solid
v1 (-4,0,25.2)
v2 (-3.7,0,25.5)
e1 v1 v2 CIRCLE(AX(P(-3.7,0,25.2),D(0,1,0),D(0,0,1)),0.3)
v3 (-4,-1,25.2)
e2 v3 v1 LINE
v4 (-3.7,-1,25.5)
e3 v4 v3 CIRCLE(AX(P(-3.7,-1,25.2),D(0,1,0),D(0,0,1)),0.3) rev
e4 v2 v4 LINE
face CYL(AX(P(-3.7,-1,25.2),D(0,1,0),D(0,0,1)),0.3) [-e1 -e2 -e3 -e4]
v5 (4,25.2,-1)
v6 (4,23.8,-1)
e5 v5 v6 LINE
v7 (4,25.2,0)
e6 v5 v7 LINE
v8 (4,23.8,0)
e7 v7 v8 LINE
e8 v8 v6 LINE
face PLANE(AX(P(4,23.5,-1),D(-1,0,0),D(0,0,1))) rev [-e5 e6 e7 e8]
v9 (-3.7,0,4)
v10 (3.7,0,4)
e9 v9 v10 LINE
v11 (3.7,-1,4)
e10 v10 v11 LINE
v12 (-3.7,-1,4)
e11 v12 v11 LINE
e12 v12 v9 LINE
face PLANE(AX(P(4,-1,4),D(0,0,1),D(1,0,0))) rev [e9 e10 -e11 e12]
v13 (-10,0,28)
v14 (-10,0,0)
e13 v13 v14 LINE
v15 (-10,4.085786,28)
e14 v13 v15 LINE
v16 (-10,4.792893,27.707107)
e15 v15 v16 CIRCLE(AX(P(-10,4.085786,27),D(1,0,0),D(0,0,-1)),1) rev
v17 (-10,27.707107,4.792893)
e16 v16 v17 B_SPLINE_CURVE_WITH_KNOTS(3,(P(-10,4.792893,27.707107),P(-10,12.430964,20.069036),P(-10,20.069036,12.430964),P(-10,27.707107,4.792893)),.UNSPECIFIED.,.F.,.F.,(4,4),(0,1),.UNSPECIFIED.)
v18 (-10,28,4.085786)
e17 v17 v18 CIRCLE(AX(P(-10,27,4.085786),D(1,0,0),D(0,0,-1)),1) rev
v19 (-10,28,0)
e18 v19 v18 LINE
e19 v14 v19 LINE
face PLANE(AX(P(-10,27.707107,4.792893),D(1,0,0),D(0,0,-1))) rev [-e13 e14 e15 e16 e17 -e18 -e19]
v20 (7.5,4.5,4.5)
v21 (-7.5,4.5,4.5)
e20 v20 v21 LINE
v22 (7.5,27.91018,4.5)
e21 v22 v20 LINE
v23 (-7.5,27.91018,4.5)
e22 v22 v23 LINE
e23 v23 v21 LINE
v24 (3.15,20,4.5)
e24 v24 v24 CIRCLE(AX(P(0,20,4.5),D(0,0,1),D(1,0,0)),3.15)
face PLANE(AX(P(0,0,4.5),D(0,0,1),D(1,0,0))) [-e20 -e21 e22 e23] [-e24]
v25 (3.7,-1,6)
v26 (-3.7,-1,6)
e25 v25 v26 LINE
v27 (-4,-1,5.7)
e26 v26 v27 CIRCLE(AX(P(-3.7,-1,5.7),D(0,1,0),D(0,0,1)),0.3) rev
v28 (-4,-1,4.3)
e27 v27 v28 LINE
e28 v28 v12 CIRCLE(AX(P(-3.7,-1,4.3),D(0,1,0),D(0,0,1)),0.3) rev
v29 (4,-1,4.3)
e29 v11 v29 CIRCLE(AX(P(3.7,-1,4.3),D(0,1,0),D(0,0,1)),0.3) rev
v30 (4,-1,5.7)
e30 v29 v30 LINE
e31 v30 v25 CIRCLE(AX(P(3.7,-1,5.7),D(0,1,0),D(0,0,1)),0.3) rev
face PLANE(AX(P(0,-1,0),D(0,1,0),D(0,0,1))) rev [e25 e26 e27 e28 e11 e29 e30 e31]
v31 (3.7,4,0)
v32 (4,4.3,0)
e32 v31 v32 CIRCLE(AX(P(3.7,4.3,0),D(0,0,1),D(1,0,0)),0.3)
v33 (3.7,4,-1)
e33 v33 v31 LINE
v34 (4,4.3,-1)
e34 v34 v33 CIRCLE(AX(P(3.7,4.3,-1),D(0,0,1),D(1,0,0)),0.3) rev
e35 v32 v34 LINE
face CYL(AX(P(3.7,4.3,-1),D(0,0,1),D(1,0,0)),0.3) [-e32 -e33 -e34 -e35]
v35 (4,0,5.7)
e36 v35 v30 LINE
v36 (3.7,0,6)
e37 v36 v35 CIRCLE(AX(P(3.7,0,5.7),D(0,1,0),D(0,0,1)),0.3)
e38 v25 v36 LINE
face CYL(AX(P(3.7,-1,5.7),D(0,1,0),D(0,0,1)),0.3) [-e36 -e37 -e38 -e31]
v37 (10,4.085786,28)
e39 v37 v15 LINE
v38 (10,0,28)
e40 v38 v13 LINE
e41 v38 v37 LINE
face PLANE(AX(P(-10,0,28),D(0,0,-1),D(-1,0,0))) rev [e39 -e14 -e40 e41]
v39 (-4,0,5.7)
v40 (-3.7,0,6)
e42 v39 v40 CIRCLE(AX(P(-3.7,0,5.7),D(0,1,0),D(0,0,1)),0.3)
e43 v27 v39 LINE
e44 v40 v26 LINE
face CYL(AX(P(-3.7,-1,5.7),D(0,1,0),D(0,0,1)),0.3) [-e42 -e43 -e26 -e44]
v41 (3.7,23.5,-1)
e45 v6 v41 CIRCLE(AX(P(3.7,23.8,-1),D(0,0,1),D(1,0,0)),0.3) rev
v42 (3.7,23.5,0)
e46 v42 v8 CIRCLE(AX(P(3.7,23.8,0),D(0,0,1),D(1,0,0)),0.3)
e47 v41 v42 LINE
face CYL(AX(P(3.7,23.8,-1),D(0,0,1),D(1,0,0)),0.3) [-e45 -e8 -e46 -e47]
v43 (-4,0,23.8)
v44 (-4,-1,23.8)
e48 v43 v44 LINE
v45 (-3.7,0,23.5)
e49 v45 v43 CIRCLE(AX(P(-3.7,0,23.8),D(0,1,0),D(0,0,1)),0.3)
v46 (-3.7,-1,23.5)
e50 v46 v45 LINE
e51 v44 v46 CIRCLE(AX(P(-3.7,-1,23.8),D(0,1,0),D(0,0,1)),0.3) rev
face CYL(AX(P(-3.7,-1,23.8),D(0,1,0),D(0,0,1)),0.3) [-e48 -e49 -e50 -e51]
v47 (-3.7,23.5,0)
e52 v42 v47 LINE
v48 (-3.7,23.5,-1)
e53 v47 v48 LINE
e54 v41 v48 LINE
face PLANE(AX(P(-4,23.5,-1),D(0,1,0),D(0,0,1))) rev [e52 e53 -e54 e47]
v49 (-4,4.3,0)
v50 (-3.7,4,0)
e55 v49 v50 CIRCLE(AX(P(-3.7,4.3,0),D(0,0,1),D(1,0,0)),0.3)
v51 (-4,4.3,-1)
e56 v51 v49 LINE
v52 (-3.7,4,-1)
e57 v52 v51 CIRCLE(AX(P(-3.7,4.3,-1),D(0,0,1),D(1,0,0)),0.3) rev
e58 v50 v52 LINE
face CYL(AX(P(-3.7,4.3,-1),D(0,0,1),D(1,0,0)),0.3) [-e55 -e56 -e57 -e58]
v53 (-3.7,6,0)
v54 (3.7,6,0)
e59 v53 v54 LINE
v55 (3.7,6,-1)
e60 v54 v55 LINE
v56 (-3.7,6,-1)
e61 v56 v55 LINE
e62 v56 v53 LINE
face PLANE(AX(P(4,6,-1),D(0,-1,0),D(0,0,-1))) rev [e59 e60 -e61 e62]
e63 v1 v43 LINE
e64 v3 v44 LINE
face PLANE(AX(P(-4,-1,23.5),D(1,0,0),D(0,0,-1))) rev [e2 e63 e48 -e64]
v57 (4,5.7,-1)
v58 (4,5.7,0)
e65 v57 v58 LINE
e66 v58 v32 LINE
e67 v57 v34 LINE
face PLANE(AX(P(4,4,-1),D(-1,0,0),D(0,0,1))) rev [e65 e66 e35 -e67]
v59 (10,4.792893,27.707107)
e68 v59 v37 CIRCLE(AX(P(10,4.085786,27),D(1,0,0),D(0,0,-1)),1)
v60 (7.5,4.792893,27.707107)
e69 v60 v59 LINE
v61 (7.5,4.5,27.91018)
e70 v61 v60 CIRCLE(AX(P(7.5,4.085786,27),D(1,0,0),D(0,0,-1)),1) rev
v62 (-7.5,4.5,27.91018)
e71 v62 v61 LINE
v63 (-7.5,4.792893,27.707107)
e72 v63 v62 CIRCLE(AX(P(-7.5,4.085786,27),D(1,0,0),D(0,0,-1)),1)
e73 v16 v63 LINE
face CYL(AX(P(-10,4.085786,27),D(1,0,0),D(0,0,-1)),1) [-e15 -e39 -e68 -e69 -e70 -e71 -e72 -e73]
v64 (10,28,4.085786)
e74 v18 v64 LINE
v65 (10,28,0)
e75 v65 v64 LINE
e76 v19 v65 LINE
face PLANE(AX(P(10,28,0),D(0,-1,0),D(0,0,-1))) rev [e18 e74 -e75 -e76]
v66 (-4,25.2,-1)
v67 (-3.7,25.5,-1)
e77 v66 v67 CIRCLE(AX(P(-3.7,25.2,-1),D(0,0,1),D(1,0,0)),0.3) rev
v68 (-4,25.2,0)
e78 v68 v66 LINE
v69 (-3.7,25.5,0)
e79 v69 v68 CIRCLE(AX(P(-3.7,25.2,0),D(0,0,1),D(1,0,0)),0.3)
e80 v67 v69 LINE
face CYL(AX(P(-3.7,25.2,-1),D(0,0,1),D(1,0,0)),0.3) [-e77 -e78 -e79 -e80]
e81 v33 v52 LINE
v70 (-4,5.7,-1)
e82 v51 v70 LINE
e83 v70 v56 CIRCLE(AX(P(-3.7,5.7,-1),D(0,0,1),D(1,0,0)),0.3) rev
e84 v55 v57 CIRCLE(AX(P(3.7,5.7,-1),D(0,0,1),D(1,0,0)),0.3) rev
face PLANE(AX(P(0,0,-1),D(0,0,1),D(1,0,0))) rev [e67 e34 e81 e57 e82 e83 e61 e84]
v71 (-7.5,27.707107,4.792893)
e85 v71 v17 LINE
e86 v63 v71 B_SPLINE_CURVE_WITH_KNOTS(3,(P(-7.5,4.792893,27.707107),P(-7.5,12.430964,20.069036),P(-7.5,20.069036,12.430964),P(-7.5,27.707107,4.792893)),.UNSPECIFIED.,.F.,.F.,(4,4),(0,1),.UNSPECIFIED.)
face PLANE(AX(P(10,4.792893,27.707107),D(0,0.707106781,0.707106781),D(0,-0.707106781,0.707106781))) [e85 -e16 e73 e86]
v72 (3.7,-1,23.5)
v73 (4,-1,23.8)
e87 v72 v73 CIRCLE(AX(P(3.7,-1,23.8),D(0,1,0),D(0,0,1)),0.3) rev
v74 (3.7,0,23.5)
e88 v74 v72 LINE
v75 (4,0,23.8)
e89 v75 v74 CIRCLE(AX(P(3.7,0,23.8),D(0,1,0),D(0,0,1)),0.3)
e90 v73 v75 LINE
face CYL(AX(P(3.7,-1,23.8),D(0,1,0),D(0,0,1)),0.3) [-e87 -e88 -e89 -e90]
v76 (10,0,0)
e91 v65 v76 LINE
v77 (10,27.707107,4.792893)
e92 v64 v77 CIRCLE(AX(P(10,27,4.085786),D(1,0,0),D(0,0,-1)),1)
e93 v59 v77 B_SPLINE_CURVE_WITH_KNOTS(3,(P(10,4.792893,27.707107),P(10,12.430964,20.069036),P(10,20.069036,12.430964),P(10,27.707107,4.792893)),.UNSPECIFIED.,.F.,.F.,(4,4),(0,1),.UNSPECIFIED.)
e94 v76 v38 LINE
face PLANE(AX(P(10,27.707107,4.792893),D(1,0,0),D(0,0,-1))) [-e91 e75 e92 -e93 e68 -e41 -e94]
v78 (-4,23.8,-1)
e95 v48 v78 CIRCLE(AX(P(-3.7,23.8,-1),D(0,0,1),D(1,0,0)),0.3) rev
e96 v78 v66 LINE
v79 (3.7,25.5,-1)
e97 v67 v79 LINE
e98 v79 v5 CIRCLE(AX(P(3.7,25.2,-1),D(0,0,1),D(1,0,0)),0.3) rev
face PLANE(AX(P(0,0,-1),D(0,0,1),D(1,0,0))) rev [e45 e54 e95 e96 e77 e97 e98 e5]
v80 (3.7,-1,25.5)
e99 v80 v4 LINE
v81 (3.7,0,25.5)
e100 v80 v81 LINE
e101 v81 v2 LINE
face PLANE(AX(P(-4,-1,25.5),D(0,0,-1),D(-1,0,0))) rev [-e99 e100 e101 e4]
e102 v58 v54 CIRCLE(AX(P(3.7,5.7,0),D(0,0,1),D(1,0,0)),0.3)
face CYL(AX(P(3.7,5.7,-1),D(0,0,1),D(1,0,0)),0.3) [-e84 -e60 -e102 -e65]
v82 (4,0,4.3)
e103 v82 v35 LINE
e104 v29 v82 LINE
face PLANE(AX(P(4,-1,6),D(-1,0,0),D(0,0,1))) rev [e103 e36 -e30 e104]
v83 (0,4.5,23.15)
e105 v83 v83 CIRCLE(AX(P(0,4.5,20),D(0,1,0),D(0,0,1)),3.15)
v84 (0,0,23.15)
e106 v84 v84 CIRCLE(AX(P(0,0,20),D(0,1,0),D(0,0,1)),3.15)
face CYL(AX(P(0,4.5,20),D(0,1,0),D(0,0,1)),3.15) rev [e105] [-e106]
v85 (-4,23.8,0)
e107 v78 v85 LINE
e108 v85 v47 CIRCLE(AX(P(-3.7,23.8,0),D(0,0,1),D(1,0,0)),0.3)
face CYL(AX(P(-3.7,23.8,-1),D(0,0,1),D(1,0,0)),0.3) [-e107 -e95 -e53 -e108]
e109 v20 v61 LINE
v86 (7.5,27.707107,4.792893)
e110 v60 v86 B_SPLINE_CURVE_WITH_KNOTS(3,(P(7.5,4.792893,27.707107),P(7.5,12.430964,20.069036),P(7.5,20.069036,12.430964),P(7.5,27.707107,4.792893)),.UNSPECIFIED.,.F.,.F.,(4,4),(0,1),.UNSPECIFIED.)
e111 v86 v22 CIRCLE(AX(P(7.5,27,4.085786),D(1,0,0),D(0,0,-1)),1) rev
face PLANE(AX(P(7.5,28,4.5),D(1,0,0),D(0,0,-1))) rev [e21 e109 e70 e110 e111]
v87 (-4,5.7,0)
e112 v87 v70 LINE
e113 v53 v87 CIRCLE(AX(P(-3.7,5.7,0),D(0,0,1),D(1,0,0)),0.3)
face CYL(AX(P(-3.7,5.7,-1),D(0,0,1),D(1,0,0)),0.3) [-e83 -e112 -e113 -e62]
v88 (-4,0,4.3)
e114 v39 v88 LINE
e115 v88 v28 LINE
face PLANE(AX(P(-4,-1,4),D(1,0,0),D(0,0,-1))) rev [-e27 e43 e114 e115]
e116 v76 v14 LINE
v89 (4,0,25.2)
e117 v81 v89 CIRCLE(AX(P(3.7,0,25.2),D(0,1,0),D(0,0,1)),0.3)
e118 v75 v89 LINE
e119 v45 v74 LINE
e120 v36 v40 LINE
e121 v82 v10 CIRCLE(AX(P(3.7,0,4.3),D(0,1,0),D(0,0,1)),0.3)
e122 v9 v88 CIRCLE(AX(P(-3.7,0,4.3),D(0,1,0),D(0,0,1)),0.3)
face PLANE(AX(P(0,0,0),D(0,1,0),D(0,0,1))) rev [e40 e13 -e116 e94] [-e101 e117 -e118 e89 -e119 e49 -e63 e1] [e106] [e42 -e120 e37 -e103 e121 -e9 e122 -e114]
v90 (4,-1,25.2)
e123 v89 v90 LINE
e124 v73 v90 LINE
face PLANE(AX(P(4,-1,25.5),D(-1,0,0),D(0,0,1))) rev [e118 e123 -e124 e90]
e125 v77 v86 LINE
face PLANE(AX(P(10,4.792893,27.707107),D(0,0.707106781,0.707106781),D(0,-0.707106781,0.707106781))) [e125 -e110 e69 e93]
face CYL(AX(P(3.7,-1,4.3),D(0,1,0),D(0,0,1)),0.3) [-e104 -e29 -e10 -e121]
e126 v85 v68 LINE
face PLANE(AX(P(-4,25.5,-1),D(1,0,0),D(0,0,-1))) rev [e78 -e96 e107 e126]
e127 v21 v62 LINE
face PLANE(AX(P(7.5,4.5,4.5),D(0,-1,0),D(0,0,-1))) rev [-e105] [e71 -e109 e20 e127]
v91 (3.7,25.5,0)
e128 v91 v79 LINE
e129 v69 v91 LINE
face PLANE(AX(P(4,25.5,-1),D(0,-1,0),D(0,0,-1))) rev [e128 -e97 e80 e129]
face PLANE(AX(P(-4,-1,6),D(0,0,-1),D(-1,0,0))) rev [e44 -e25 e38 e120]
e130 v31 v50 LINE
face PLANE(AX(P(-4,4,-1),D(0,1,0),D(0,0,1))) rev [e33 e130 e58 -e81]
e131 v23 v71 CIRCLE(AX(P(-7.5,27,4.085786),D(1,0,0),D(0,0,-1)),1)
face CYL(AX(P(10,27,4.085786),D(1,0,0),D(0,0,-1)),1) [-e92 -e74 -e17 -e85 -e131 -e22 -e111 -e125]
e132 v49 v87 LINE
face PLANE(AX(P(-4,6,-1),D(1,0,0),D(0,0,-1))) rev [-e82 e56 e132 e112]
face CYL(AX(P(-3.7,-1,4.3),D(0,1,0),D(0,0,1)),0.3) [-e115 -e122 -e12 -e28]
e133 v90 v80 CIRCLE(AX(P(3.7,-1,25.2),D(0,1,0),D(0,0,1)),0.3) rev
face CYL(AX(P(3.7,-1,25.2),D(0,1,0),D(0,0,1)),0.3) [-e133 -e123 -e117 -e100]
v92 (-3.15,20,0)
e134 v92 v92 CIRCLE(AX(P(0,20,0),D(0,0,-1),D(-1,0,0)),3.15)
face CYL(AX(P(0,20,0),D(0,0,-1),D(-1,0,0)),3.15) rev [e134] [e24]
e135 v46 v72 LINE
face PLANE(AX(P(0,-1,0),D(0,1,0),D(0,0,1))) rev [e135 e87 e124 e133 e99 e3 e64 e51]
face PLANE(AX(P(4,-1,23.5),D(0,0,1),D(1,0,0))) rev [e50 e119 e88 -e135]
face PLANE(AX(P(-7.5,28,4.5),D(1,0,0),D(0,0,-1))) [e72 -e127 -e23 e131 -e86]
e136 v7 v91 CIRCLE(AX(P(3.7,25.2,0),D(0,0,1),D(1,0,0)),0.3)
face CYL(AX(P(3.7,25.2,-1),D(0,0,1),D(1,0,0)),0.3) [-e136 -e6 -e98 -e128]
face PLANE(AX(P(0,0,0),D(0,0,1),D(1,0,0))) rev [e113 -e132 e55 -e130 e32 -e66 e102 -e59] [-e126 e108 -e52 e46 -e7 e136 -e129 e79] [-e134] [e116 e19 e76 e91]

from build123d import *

# Parameters (mm, degrees)
BOSS_EXTRUDE1_DEPTH            = 20
SKETCH2_W                      = 20
SKETCH2_H                      = 23.5
BOSS_EXTRUDE2_DEPTH            = 4.5
CUT_EXTRUDE1_DEPTH             = 15
SKETCH4_W                      = 20
SKETCH4_H                      = 28
BOSS_EXTRUDE3_DEPTH            = 4.5
SKETCH5_W                      = 8
SKETCH5_H                      = 2
BOSS_EXTRUDE4_DEPTH            = 1
SKETCH6_W                      = 8
SKETCH6_H                      = 2
BOSS_EXTRUDE5_DEPTH            = 1
SKETCH7_W                      = 8
SKETCH7_H                      = 2
BOSS_EXTRUDE6_DEPTH            = 1
SKETCH8_W                      = 8
SKETCH8_H                      = 2
BOSS_EXTRUDE7_DEPTH            = 1
F_6_3_6_3_DIAMETER_HOLE1_D     = 6.3
F_6_3_6_3_DIAMETER_HOLE1_DEPTH = 28
F_6_3_6_3_DIAMETER_HOLE2_D     = 6.3
F_6_3_6_3_DIAMETER_HOLE2_DEPTH = 5.5
FILLET1_R                      = 0.3
FILLET2_START                  = -11
FILLET2_DEPTH                  = 22


with BuildPart() as part:
    # Sketch1 → Boss-Extrude1 (new body)
    with BuildSketch(Plane(origin=(-10, 0, 0), x_dir=(0, -1, 0), z_dir=(-1, 0, 0))):
        with BuildLine():
            Line((-28, 4.5), (-4.5, 4.5))
            Line((-4.5, 4.5), (-4.5, 28))
            Line((-4.5, 28), (-4.792893219, 27.707106781))
            add(Edge.make_bspline(
                [(-4.792893219, 27.707106781), (-12.430964406, 20.069035594), (-20.069035594, 12.430964406), (-27.707106781, 4.792893219)],
                knots=[0, 0, 0, 0, 1, 1, 1, 1], degree=3))
            Line((-27.707106781, 4.792893219), (-28, 4.5))
        make_face()
    extrude(amount=-BOSS_EXTRUDE1_DEPTH)

    # Sketch2 → Boss-Extrude2 (add)
    with BuildSketch(Plane.XZ.offset(-4.5)):
        with Locations((0, 16.25)):
            Rectangle(SKETCH2_W, SKETCH2_H)
    extrude(amount=BOSS_EXTRUDE2_DEPTH)

    # Sketch3 → Cut-Extrude1 (cut)
    with BuildSketch(Plane(origin=(-7.5, 0, 0), x_dir=(0, -1, 0), z_dir=(-1, 0, 0))):
        with BuildLine():
            Line((-4.5, 4.5), (-4.5, 28))
            Line((-4.5, 28), (-4.792893219, 27.707106781))
            add(Edge.make_bspline(
                [(-4.792893219, 27.707106781), (-12.430964406, 20.069035594), (-20.069035594, 12.430964406), (-27.707106781, 4.792893219)],
                knots=[0, 0, 0, 0, 1, 1, 1, 1], degree=3))
            Line((-27.707106781, 4.792893219), (-28, 4.5))
            Line((-28, 4.5), (-4.5, 4.5))
        make_face()
    extrude(amount=-CUT_EXTRUDE1_DEPTH, mode=Mode.SUBTRACT)

    # Sketch4 → Boss-Extrude3 (add)
    with BuildSketch(Plane(origin=(0, 0, 4.5), x_dir=(-1, 0, 0), z_dir=(0, 0, -1))):
        with Locations((0, 14)):
            Rectangle(SKETCH4_W, SKETCH4_H)
    extrude(amount=BOSS_EXTRUDE3_DEPTH)

    # Sketch5 → Boss-Extrude4 (add)
    with BuildSketch(Plane.XZ):
        with Locations((0, 24.5)):
            Rectangle(SKETCH5_W, SKETCH5_H)
    extrude(amount=BOSS_EXTRUDE4_DEPTH)

    # Sketch6 → Boss-Extrude5 (add)
    with BuildSketch(Plane.XZ):
        with Locations((0, 5)):
            Rectangle(SKETCH6_W, SKETCH6_H)
    extrude(amount=BOSS_EXTRUDE5_DEPTH)

    # Sketch7 → Boss-Extrude6 (add)
    with BuildSketch(Plane(origin=(0, 0, 0), x_dir=(-1, 0, 0), z_dir=(0, 0, -1))):
        with Locations((0, 5)):
            Rectangle(SKETCH7_W, SKETCH7_H)
    extrude(amount=BOSS_EXTRUDE6_DEPTH)

    # Sketch8 → Boss-Extrude7 (add)
    with BuildSketch(Plane(origin=(0, 0, 0), x_dir=(-1, 0, 0), z_dir=(0, 0, -1))):
        with Locations((0, 24.5)):
            Rectangle(SKETCH8_W, SKETCH8_H)
    extrude(amount=BOSS_EXTRUDE7_DEPTH)

    # Ø6.3 (6.3) Diameter Hole1
    with Locations(Plane(origin=(0, 0, 0), x_dir=(-1, 0, 0), z_dir=(0, 0, -1))):
        with Locations((0, 20)):
            Hole(F_6_3_6_3_DIAMETER_HOLE1_D / 2, depth=F_6_3_6_3_DIAMETER_HOLE1_DEPTH)

    # Ø6.3 (6.3) Diameter Hole2
    with Locations(Plane(origin=(0, 4.5, 0), x_dir=(1, 0, 0), z_dir=(0, 1, 0))):
        with Locations((0, -20)):
            Hole(F_6_3_6_3_DIAMETER_HOLE2_D / 2, depth=F_6_3_6_3_DIAMETER_HOLE2_DEPTH)

    # Fillet1
    fillet1_edges = [part.edges().sort_by_distance(p)[0] for p in [
        (-4, 23.5, -0.5),
        (-4, 25.5, -0.5),
        (4, 25.5, -0.5),
        (4, 23.5, -0.5),
        (4, -0.5, 25.5),
        (-4, -0.5, 25.5),
        (-4, -0.5, 23.5),
        (4, -0.5, 23.5),
        (4, -0.5, 6),
        (-4, -0.5, 6),
        (-4, -0.5, 4),
        (4, -0.5, 4),
        (-4, 4, -0.5),
        (-4, 6, -0.5),
        (4, 6, -0.5),
        (4, 4, -0.5),
    ]]
    fillet(fillet1_edges, radius=FILLET1_R)

    # Fillet2: read off the stored shape, not the designer's step
    # Fillet2 outline → Fillet2 (cut)
    with BuildSketch(Plane.YZ.offset(FILLET2_START)):
        with BuildLine():
            Line((28, 4.085786438), (28, 4.5))
            Line((28, 4.5), (27.707106781, 4.792893219))
            ThreePointArc((27.707106781, 4.792893219), (27.923879533, 4.46846987), (28, 4.085786438))
        make_face()
        with BuildLine():
            Line((4.792893219, 27.707106781), (4.5, 28))
            Line((4.5, 28), (4.085786438, 28))
            ThreePointArc((4.085786438, 28), (4.46846987, 27.923879533), (4.792893219, 27.707106781))
        make_face()
    extrude(amount=FILLET2_DEPTH, mode=Mode.SUBTRACT)


solid = part.part
